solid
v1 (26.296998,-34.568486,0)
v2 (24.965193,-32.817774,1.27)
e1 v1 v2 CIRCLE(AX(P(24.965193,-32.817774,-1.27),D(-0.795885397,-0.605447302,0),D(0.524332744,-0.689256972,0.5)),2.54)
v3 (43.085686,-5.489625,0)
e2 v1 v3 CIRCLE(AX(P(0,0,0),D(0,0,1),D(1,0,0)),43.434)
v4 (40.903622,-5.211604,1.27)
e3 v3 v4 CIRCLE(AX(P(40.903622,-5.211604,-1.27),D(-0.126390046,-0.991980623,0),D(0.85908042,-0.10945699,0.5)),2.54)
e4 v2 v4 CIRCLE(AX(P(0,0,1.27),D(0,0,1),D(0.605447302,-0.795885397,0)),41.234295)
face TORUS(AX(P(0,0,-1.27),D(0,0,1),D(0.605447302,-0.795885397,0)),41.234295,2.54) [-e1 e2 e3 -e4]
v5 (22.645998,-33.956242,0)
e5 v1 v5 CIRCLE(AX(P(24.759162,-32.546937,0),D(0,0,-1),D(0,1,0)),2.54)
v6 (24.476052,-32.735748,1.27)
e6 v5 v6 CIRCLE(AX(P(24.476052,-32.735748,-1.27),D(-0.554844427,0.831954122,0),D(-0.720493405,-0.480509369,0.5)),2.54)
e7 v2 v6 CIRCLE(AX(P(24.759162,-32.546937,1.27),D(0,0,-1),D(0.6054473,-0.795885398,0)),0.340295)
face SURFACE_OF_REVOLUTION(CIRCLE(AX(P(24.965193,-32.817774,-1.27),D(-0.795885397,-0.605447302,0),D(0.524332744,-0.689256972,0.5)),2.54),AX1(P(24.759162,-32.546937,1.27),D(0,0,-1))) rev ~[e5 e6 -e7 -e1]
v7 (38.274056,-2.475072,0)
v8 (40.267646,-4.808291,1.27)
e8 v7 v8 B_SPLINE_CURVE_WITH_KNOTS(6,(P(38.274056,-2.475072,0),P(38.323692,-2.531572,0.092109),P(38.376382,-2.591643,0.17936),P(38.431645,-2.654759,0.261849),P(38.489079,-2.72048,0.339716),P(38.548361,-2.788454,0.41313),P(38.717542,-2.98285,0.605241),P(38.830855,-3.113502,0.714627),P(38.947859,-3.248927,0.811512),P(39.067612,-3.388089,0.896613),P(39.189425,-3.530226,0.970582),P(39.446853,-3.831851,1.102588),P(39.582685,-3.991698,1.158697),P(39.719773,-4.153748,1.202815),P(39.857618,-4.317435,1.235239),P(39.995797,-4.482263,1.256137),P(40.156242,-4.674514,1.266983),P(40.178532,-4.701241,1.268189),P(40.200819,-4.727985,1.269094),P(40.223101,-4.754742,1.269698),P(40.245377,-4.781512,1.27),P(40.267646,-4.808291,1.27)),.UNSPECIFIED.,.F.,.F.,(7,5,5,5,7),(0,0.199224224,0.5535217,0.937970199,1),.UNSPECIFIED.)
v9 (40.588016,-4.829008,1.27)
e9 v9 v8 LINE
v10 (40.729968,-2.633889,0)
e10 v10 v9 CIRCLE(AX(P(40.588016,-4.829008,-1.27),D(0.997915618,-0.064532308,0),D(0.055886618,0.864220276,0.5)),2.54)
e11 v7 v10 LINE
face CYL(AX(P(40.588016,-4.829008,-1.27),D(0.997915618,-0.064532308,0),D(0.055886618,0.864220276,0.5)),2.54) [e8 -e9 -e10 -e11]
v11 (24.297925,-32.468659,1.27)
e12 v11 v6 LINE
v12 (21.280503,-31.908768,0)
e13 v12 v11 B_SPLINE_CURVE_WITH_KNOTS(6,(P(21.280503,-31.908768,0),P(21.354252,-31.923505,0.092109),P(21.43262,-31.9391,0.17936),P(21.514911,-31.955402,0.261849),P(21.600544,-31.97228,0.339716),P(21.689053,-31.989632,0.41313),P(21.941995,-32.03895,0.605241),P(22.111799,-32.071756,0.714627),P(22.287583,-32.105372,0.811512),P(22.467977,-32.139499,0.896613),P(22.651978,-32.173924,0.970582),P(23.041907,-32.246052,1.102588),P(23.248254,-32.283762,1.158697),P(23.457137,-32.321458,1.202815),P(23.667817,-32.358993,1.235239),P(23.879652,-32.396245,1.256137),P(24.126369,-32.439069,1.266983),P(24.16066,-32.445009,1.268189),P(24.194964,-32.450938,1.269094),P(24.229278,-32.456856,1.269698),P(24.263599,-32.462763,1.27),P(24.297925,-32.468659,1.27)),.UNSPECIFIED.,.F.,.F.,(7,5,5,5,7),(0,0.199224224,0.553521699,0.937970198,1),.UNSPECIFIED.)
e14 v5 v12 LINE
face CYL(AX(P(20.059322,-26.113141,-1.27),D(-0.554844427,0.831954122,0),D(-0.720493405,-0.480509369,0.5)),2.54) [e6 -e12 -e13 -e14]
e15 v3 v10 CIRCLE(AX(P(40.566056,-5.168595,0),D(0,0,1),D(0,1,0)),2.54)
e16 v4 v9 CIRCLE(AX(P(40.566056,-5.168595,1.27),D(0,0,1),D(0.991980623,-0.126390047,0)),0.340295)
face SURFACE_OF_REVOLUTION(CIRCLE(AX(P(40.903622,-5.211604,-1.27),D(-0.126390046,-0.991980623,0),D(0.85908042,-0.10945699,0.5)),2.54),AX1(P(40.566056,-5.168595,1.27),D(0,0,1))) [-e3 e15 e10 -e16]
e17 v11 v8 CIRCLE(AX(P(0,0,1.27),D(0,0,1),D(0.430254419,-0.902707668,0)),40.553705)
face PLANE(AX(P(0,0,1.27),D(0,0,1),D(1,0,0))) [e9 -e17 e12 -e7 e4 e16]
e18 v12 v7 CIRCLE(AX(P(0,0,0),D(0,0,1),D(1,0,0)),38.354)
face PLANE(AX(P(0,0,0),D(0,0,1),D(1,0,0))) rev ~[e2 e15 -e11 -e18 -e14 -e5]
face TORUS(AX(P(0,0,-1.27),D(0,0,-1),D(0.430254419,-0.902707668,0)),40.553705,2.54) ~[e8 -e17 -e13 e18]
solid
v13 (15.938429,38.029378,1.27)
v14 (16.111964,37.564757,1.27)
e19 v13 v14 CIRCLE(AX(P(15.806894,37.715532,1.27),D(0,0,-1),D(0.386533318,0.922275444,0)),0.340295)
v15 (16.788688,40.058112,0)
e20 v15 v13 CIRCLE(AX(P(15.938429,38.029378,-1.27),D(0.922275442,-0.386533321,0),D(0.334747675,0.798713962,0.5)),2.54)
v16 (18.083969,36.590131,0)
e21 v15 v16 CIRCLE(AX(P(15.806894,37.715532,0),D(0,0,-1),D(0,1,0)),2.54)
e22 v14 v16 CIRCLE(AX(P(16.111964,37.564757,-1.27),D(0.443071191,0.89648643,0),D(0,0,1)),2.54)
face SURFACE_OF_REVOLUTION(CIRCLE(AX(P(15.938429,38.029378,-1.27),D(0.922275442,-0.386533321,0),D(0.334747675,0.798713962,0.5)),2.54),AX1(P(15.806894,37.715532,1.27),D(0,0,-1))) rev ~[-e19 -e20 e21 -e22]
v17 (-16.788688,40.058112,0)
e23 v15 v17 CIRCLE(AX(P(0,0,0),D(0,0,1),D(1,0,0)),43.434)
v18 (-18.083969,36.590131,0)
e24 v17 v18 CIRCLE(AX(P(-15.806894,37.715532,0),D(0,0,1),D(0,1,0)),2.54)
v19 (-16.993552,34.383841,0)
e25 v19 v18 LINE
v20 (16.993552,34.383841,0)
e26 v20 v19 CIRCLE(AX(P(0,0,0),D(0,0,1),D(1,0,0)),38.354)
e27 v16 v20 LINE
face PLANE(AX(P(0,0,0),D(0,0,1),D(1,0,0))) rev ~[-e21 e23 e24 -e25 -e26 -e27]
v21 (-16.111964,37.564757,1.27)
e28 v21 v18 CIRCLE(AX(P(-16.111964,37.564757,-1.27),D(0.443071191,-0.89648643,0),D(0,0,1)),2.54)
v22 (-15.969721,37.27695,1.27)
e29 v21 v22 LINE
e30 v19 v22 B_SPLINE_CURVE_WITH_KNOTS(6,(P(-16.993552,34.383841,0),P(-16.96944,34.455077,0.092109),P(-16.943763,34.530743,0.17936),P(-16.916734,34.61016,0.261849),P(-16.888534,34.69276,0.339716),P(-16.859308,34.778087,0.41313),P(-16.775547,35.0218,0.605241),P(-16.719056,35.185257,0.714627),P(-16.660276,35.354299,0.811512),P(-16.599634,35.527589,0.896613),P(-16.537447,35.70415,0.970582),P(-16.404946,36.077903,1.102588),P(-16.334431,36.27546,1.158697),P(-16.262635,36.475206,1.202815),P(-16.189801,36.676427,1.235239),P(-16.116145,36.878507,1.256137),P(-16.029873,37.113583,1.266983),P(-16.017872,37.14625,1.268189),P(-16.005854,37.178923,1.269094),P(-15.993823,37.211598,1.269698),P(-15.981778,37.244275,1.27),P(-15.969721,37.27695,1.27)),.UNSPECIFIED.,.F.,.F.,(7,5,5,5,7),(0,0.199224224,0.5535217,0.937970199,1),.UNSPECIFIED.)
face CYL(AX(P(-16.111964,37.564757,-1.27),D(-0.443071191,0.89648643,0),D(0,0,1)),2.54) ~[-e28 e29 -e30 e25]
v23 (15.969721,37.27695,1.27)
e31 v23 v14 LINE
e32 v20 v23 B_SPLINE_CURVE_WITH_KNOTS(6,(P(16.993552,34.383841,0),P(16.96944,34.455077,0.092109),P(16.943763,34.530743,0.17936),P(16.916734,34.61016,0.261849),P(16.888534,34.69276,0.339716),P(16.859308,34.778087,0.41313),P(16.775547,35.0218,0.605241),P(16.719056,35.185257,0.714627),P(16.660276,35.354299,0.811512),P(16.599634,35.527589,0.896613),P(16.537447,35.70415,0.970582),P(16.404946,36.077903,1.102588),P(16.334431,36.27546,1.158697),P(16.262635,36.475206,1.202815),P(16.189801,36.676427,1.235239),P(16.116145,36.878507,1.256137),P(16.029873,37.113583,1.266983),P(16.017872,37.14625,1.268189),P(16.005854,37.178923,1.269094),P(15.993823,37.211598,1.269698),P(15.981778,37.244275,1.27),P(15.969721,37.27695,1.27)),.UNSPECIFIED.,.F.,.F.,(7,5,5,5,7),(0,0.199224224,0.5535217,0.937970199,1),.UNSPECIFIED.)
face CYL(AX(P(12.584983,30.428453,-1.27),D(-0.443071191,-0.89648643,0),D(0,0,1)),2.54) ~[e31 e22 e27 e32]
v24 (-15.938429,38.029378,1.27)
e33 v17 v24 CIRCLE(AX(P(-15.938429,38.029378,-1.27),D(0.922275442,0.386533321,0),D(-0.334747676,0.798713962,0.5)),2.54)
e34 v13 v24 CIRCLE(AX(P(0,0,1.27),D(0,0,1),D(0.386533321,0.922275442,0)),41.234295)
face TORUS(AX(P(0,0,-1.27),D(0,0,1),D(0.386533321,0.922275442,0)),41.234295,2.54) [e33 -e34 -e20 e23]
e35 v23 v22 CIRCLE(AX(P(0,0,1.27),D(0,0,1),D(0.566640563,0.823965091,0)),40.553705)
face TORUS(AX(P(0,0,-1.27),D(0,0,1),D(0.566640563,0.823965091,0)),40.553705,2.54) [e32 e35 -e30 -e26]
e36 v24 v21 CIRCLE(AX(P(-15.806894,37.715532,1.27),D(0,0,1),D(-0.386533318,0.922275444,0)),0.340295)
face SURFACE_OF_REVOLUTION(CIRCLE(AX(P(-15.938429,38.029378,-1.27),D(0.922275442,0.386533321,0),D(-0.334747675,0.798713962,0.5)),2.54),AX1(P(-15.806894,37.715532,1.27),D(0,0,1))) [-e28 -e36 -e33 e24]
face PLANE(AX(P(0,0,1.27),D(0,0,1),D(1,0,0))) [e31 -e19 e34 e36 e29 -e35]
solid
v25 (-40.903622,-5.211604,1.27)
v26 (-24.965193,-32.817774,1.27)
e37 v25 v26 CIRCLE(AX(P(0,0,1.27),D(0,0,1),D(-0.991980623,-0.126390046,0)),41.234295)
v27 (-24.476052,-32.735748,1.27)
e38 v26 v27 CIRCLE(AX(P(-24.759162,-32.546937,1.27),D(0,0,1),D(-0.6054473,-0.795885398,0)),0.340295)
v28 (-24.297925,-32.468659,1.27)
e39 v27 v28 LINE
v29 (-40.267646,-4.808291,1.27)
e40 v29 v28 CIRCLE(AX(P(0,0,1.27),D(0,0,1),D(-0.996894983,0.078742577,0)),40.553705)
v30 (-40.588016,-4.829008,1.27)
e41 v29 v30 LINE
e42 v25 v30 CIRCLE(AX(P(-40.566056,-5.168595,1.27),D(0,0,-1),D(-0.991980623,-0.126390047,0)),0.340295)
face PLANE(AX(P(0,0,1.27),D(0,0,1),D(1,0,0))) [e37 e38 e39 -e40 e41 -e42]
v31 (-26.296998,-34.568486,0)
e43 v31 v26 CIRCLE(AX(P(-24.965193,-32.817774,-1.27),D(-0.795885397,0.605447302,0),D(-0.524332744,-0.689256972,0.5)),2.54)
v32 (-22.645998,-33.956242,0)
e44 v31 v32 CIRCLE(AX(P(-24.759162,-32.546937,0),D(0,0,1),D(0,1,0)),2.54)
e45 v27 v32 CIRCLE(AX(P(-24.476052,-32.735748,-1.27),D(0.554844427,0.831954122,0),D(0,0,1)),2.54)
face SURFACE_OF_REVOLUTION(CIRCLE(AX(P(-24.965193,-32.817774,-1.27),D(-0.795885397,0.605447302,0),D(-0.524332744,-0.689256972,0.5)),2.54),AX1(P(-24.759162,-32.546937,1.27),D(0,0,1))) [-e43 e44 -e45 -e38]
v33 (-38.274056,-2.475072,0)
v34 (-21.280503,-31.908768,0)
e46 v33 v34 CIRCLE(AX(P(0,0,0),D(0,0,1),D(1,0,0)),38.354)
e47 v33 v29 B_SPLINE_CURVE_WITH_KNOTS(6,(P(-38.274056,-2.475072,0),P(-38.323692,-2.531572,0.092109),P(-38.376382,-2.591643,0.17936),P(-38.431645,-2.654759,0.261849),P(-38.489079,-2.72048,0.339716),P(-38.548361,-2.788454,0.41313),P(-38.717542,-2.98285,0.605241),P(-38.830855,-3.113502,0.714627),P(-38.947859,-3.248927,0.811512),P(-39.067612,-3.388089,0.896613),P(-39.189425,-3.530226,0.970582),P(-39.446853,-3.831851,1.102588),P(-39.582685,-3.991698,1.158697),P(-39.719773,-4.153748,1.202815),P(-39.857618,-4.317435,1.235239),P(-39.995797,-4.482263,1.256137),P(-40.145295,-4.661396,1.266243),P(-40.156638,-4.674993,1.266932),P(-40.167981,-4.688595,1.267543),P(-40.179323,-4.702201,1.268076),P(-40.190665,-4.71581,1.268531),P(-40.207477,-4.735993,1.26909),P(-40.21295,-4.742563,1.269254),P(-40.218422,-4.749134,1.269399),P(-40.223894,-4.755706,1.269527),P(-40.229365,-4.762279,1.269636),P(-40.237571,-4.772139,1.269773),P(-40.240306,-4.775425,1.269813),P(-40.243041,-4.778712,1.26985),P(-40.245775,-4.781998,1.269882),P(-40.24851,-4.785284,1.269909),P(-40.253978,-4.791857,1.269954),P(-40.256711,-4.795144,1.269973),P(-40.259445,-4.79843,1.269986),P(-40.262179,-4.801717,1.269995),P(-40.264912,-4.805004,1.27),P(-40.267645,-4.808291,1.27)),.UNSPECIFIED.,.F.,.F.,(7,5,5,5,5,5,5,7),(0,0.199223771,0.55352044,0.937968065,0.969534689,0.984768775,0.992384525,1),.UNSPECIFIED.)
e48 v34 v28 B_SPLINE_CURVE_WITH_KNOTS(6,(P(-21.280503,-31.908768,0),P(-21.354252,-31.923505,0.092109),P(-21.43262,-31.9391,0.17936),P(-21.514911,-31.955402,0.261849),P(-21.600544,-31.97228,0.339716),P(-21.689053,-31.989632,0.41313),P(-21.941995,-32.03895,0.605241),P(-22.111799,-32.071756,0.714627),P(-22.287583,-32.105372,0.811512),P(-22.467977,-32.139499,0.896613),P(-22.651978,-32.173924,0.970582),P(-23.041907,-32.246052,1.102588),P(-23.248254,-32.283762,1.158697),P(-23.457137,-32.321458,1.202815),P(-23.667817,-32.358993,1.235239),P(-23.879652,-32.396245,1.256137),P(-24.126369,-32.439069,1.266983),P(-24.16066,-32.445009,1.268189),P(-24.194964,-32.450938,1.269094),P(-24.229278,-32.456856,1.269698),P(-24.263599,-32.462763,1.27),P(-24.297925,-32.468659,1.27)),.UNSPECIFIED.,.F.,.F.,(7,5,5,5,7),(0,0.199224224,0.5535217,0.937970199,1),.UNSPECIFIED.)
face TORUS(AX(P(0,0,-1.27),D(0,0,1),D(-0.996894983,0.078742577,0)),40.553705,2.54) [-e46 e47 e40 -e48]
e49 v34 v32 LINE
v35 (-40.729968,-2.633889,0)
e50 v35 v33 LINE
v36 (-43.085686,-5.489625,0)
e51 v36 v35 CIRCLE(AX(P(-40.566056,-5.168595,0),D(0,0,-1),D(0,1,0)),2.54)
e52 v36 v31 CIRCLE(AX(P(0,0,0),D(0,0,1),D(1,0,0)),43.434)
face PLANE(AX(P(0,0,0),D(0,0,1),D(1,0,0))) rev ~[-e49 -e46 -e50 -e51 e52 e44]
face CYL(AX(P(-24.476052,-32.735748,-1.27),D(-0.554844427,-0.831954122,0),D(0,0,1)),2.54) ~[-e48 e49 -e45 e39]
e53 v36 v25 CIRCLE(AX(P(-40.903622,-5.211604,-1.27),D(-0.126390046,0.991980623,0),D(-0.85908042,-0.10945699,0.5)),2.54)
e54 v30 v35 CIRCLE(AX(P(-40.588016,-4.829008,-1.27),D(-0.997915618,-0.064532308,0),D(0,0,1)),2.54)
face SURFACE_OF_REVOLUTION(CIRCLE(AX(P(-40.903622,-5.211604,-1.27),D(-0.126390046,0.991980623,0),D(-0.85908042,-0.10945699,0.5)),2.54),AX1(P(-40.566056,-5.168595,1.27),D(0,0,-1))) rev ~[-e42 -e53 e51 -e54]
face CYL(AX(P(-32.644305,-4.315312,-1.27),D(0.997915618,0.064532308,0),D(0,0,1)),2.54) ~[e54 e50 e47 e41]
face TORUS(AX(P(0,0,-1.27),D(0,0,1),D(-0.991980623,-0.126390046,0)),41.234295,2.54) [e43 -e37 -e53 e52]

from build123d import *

# Parameters (mm, degrees)
F0_R            = 43.434
F0_R_2          = 38.354
F1_DEPTH        = 1.27
F3_DEPTH        = 25.4
F4_F1_R         = 2.54
F4_F2_R         = 2.54
F4_S1_F1_R      = 2.54
F4_S1_F2_R      = 2.54
F4_S2_F1_R      = 2.54
F4_S2_F2_R      = 2.54
F5_T1_DEPTH     = 7.9603031001
F5_T3_DEPTH     = 7.9603031001
F5_T6_ANGLE     = 45.477927501
F5_T8_ANGLE     = 69.0325853679
F5_T10_ANGLE    = 93.5610362495
F5_T12_ANGLE    = 93.5610362495
F5_S1_T1_DEPTH  = 7.9603031001
F5_S1_T3_DEPTH  = 7.9603031001
F5_S1_T6_ANGLE  = 45.477927501
F5_S1_T8_ANGLE  = 69.0325853679
F5_S1_T10_ANGLE = 93.5610362495
F5_S1_T12_ANGLE = 93.5610362495
F5_S2_T1_DEPTH  = 7.9603031001
F5_S2_T3_DEPTH  = 7.9603031001
F5_S2_T6_ANGLE  = 45.477927501
F5_S2_T8_ANGLE  = 69.0325853679
F5_S2_T10_ANGLE = 93.5610362495
F5_S2_T12_ANGLE = 93.5610362495


# Not quite as in the source:
# - a fillet or chamfer that OpenCascade refuses, or shapes differently, is made with other operations: its cross-section is extruded or revolved along the edge and cut away or added


with BuildPart() as f1:
    # F0 (on Top) → F1 (new body)
    with BuildSketch(Plane.XY):
        Circle(F0_R)
        Circle(F0_R_2, mode=Mode.SUBTRACT)
    extrude(amount=F1_DEPTH)

    # F2 (on Top) → F3 (cut)
    with BuildSketch(Plane.XY):
        Polygon((34.5006046501, -51.7314743282), (0, 0), (-34.5006046501, -51.7314743282), (0, -51.7314743282), align=None)
        Polygon((27.5504686184, 55.744137237), (0, 0), (62.0510732685, -4.0126629088), (44.8007709434, 25.8657371641), align=None)
        Polygon((-62.0510732685, -4.0126629088), (0, 0), (-27.5504686184, 55.744137237), (-44.8007709434, 25.8657371641), align=None)
    extrude(amount=F3_DEPTH, mode=Mode.SUBTRACT)

    # F4: fillet of radius 2.54 on 2 edges, made by hand

    # F4_f1
    f4_f1_edges = [f1.edges().sort_by_distance(p)[0] for p in [
        (-19.2443541023, 38.9379916173, 0.635),
    ]]
    fillet(f4_f1_edges, radius=F4_F1_R)

    # F4_f2
    f4_f2_edges = [f1.edges().sort_by_distance(p)[0] for p in [
        (19.2443541023, 38.9379916173, 0.635),
    ]]
    fillet(f4_f2_edges, radius=F4_F2_R)

    # F4#s1: fillet of radius 2.54 on 2 edges, made by hand

    # F4_s1_f1
    f4_s1_f1_edges = [f1.edges().sort_by_distance(p)[0] for p in [
        (43.343466964, -2.8028962767, 0.635),
    ]]
    fillet(f4_s1_f1_edges, radius=F4_S1_F1_R)

    # F4_s1_f2
    f4_s1_f2_edges = [f1.edges().sort_by_distance(p)[0] for p in [
        (24.0991128618, -36.1350953406, 0.635),
    ]]
    fillet(f4_s1_f2_edges, radius=F4_S1_F2_R)

    # F4#s2: fillet of radius 2.54 on 2 edges, made by hand

    # F4_s2_f1
    f4_s2_f1_edges = [f1.edges().sort_by_distance(p)[0] for p in [
        (-24.0991128618, -36.1350953406, 0.635),
    ]]
    fillet(f4_s2_f1_edges, radius=F4_S2_F1_R)

    # F4_s2_f2
    f4_s2_f2_edges = [f1.edges().sort_by_distance(p)[0] for p in [
        (-43.343466964, -2.8028962767, 0.635),
    ]]
    fillet(f4_s2_f2_edges, radius=F4_S2_F2_R)

    # F5: fillet of radius 2.54 on 2 edges, made by hand

    # F5_s2 → F5_t1 (cut)
    with BuildSketch(Plane(origin=(-22.6459984911, -33.9562422589, 0), x_dir=(0, 0, 1), z_dir=(0.5548444274, 0.8319541221, 0))):
        with BuildLine():
            ThreePointArc((1.27, -2.1997045256), (0.9297045256, -0.9297045256), (0, 0))
            Line((0, 0), (1.27, 0))
            Line((1.27, 0), (1.27, -2.1997045256))
        make_face()
    extrude(amount=F5_T1_DEPTH, mode=Mode.SUBTRACT)

    # F5_s4 → F5_t3 (cut)
    with BuildSketch(Plane(origin=(-32.786256869, -2.1201921245, 0), x_dir=(0, 0, 1), z_dir=(-0.9979156183, -0.0645323083, 0))):
        with BuildLine():
            ThreePointArc((1.27, -2.1997045256), (0.9297045256, -0.9297045256), (0, 0))
            Line((0, 0), (1.27, 0))
            Line((1.27, 0), (1.27, -2.1997045256))
        make_face()
    extrude(amount=F5_T3_DEPTH, mode=Mode.SUBTRACT)

    # F5_s5 → F5_t6 (revolve, cut)
    with BuildSketch(Plane(origin=(0, 0, 0), x_dir=(0, 0, 1), z_dir=(-0.1263900457, 0.991980623, 0))):
        with BuildLine():
            ThreePointArc((0, -43.434), (0.9297045256, -42.5042954744), (1.27, -41.2342954744))
            Line((1.27, -41.2342954744), (1.27, -43.434))
            Line((1.27, -43.434), (0, -43.434))
        make_face()
    revolve(axis=Axis((0, 0, 1.27), (0, 0, 1)), revolution_arc=F5_T6_ANGLE, mode=Mode.SUBTRACT)

    # F5_s7 → F5_t8 (revolve, cut)
    with BuildSketch(Plane(origin=(0, 0, 0), x_dir=(0, 0, 1), z_dir=(0.0787425769, 0.9968949827, 0))):
        with BuildLine():
            ThreePointArc((1.27, -40.5537045256), (0.9297045256, -39.2837045256), (0, -38.354))
            Line((0, -38.354), (1.27, -38.354))
            Line((1.27, -38.354), (1.27, -40.5537045256))
        make_face()
    revolve(axis=Axis((0, 0, 1.27), (0, 0, 1)), revolution_arc=F5_T8_ANGLE, mode=Mode.SUBTRACT)

    # F5_s9 → F5_t10 (revolve, cut)
    with BuildSketch(Plane(origin=(0, 0, 0), x_dir=(0, 0, 1), z_dir=(0.1263900457, -0.991980623, 0))):
        with BuildLine():
            ThreePointArc((0, 43.434), (0.9297045256, 42.5042954744), (1.27, 41.2342954744))
            Line((1.27, 41.2342954744), (1.27, 43.434))
            Line((1.27, 43.434), (0, 43.434))
        make_face()
    revolve(axis=Axis((-40.5660555958, -5.1685945283, 1.27), (0, 0, -1)), revolution_arc=F5_T10_ANGLE, mode=Mode.SUBTRACT)

    # F5_s11 → F5_t12 (revolve, cut)
    with BuildSketch(Plane(origin=(0, 0, 0), x_dir=(0, 0, 1), z_dir=(-0.7958853967, 0.6054473018, 0))):
        with BuildLine():
            ThreePointArc((0, -43.434), (0.9297045256, -42.5042954744), (1.27, -41.2342954744))
            Line((1.27, -41.2342954744), (1.27, -43.434))
            Line((1.27, -43.434), (0, -43.434))
        make_face()
    revolve(axis=Axis((-24.7591619613, -32.5469374131, 1.27), (0, 0, 1)), revolution_arc=F5_T12_ANGLE, mode=Mode.SUBTRACT)

    # F5#s1: fillet of radius 2.54 on 2 edges, made by hand

    # F5_s1_s2 → F5_s1_t1 (cut)
    with BuildSketch(Plane(origin=(40.7299676588, -2.6338888579, 0), x_dir=(0, 0, 1), z_dir=(-0.9979156183, 0.0645323083, 0))):
        with BuildLine():
            ThreePointArc((0, 0), (0.9297045256, -0.9297045256), (1.27, -2.1997045256))
            Line((1.27, -2.1997045256), (1.27, 0))
            Line((1.27, 0), (0, 0))
        make_face()
    extrude(amount=F5_S1_T1_DEPTH, mode=Mode.SUBTRACT)

    # F5_s1_s4 → F5_s1_t3 (cut)
    with BuildSketch(Plane(origin=(18.2292686752, -27.3336352813, 0), x_dir=(0, 0, 1), z_dir=(0.5548444274, -0.8319541221, 0))):
        with BuildLine():
            ThreePointArc((0, 0), (0.9297045256, -0.9297045256), (1.27, -2.1997045256))
            Line((1.27, -2.1997045256), (1.27, 0))
            Line((1.27, 0), (0, 0))
        make_face()
    extrude(amount=F5_S1_T3_DEPTH, mode=Mode.SUBTRACT)

    # F5_s1_s5 → F5_s1_t6 (revolve, cut)
    with BuildSketch(Plane(origin=(0, 0, 0), x_dir=(0, 0, 1), z_dir=(-0.7958853967, -0.6054473018, 0))):
        with BuildLine():
            ThreePointArc((0, -43.434), (0.9297045256, -42.5042954744), (1.27, -41.2342954744))
            Line((1.27, -41.2342954744), (1.27, -43.434))
            Line((1.27, -43.434), (0, -43.434))
        make_face()
    revolve(axis=Axis((0, 0, 1.27), (0, 0, 1)), revolution_arc=F5_S1_T6_ANGLE, mode=Mode.SUBTRACT)

    # F5_s1_s7 → F5_s1_t8 (revolve, cut)
    with BuildSketch(Plane(origin=(0, 0, 0), x_dir=(0, 0, 1), z_dir=(-0.9027076684, -0.4302544194, 0))):
        with BuildLine():
            ThreePointArc((0, -38.354), (0.9297045256, -39.2837045256), (1.27, -40.5537045256))
            Line((1.27, -40.5537045256), (1.27, -38.354))
            Line((1.27, -38.354), (0, -38.354))
        make_face()
    revolve(axis=Axis((0, 0, 1.27), (0, 0, 1)), revolution_arc=F5_S1_T8_ANGLE, mode=Mode.SUBTRACT)

    # F5_s1_s9 → F5_s1_t10 (revolve, cut)
    with BuildSketch(Plane(origin=(0, 0, 0), x_dir=(0, 0, 1), z_dir=(0.7958853967, 0.6054473018, 0))):
        with BuildLine():
            ThreePointArc((0, 43.434), (0.9297045256, 42.5042954744), (1.27, 41.2342954744))
            Line((1.27, 41.2342954744), (1.27, 43.434))
            Line((1.27, 43.434), (0, 43.434))
        make_face()
    revolve(axis=Axis((24.7591619613, -32.5469374131, 1.27), (0, 0, -1)), revolution_arc=F5_S1_T10_ANGLE, mode=Mode.SUBTRACT)

    # F5_s1_s11 → F5_s1_t12 (revolve, cut)
    with BuildSketch(Plane(origin=(0, 0, 0), x_dir=(0, 0, 1), z_dir=(-0.1263900457, -0.991980623, 0))):
        with BuildLine():
            ThreePointArc((0, -43.434), (0.9297045256, -42.5042954744), (1.27, -41.2342954744))
            Line((1.27, -41.2342954744), (1.27, -43.434))
            Line((1.27, -43.434), (0, -43.434))
        make_face()
    revolve(axis=Axis((40.5660555958, -5.1685945283, 1.27), (0, 0, 1)), revolution_arc=F5_S1_T12_ANGLE, mode=Mode.SUBTRACT)

    # F5#s2: fillet of radius 2.54 on 2 edges, made by hand

    # F5_s2_s2 → F5_s2_t1 (cut)
    with BuildSketch(Plane(origin=(-18.0839691677, 36.5901311168, 0), x_dir=(0, 0, 1), z_dir=(0.4430711908, -0.8964864304, 0))):
        with BuildLine():
            ThreePointArc((1.27, -2.1997045256), (0.9297045256, -0.9297045256), (0, 0))
            Line((0, 0), (1.27, 0))
            Line((1.27, 0), (1.27, -2.1997045256))
        make_face()
    extrude(amount=F5_S2_T1_DEPTH, mode=Mode.SUBTRACT)

    # F5_s2_s4 → F5_s2_t3 (cut)
    with BuildSketch(Plane(origin=(14.5569881938, 29.4538274058, 0), x_dir=(0, 0, 1), z_dir=(0.4430711908, 0.8964864304, 0))):
        with BuildLine():
            ThreePointArc((1.27, -2.1997045256), (0.9297045256, -0.9297045256), (0, 0))
            Line((0, 0), (1.27, 0))
            Line((1.27, 0), (1.27, -2.1997045256))
        make_face()
    extrude(amount=F5_S2_T3_DEPTH, mode=Mode.SUBTRACT)

    # F5_s2_s5 → F5_s2_t6 (revolve, cut)
    with BuildSketch(Plane(origin=(0, 0, 0), x_dir=(0, 0, 1), z_dir=(0.9222754424, -0.3865333211, 0))):
        with BuildLine():
            ThreePointArc((0, -43.434), (0.9297045256, -42.5042954744), (1.27, -41.2342954744))
            Line((1.27, -41.2342954744), (1.27, -43.434))
            Line((1.27, -43.434), (0, -43.434))
        make_face()
    revolve(axis=Axis((0, 0, 1.27), (0, 0, 1)), revolution_arc=F5_S2_T6_ANGLE, mode=Mode.SUBTRACT)

    # F5_s2_s7 → F5_s2_t8 (revolve, cut)
    with BuildSketch(Plane(origin=(0, 0, 0), x_dir=(0, 0, 1), z_dir=(0.8239650915, -0.5666405634, 0))):
        with BuildLine():
            ThreePointArc((1.27, -40.5537045256), (0.9297045256, -39.2837045256), (0, -38.354))
            Line((0, -38.354), (1.27, -38.354))
            Line((1.27, -38.354), (1.27, -40.5537045256))
        make_face()
    revolve(axis=Axis((0, 0, 1.27), (0, 0, 1)), revolution_arc=F5_S2_T8_ANGLE, mode=Mode.SUBTRACT)

    # F5_s2_s9 → F5_s2_t10 (revolve, cut)
    with BuildSketch(Plane(origin=(0, 0, 0), x_dir=(0, 0, 1), z_dir=(-0.9222754424, 0.3865333211, 0))):
        with BuildLine():
            ThreePointArc((0, 43.434), (0.9297045256, 42.5042954744), (1.27, 41.2342954744))
            Line((1.27, 41.2342954744), (1.27, 43.434))
            Line((1.27, 43.434), (0, 43.434))
        make_face()
    revolve(axis=Axis((15.8068936345, 37.7155319415, 1.27), (0, 0, -1)), revolution_arc=F5_S2_T10_ANGLE, mode=Mode.SUBTRACT)

    # F5_s2_s11 → F5_s2_t12 (revolve, cut)
    with BuildSketch(Plane(origin=(0, 0, 0), x_dir=(0, 0, 1), z_dir=(0.9222754424, 0.3865333211, 0))):
        with BuildLine():
            ThreePointArc((0, -43.434), (0.9297045256, -42.5042954744), (1.27, -41.2342954744))
            Line((1.27, -41.2342954744), (1.27, -43.434))
            Line((1.27, -43.434), (0, -43.434))
        make_face()
    revolve(axis=Axis((-15.8068936345, 37.7155319415, 1.27), (0, 0, 1)), revolution_arc=F5_S2_T12_ANGLE, mode=Mode.SUBTRACT)


solid = f1.part
